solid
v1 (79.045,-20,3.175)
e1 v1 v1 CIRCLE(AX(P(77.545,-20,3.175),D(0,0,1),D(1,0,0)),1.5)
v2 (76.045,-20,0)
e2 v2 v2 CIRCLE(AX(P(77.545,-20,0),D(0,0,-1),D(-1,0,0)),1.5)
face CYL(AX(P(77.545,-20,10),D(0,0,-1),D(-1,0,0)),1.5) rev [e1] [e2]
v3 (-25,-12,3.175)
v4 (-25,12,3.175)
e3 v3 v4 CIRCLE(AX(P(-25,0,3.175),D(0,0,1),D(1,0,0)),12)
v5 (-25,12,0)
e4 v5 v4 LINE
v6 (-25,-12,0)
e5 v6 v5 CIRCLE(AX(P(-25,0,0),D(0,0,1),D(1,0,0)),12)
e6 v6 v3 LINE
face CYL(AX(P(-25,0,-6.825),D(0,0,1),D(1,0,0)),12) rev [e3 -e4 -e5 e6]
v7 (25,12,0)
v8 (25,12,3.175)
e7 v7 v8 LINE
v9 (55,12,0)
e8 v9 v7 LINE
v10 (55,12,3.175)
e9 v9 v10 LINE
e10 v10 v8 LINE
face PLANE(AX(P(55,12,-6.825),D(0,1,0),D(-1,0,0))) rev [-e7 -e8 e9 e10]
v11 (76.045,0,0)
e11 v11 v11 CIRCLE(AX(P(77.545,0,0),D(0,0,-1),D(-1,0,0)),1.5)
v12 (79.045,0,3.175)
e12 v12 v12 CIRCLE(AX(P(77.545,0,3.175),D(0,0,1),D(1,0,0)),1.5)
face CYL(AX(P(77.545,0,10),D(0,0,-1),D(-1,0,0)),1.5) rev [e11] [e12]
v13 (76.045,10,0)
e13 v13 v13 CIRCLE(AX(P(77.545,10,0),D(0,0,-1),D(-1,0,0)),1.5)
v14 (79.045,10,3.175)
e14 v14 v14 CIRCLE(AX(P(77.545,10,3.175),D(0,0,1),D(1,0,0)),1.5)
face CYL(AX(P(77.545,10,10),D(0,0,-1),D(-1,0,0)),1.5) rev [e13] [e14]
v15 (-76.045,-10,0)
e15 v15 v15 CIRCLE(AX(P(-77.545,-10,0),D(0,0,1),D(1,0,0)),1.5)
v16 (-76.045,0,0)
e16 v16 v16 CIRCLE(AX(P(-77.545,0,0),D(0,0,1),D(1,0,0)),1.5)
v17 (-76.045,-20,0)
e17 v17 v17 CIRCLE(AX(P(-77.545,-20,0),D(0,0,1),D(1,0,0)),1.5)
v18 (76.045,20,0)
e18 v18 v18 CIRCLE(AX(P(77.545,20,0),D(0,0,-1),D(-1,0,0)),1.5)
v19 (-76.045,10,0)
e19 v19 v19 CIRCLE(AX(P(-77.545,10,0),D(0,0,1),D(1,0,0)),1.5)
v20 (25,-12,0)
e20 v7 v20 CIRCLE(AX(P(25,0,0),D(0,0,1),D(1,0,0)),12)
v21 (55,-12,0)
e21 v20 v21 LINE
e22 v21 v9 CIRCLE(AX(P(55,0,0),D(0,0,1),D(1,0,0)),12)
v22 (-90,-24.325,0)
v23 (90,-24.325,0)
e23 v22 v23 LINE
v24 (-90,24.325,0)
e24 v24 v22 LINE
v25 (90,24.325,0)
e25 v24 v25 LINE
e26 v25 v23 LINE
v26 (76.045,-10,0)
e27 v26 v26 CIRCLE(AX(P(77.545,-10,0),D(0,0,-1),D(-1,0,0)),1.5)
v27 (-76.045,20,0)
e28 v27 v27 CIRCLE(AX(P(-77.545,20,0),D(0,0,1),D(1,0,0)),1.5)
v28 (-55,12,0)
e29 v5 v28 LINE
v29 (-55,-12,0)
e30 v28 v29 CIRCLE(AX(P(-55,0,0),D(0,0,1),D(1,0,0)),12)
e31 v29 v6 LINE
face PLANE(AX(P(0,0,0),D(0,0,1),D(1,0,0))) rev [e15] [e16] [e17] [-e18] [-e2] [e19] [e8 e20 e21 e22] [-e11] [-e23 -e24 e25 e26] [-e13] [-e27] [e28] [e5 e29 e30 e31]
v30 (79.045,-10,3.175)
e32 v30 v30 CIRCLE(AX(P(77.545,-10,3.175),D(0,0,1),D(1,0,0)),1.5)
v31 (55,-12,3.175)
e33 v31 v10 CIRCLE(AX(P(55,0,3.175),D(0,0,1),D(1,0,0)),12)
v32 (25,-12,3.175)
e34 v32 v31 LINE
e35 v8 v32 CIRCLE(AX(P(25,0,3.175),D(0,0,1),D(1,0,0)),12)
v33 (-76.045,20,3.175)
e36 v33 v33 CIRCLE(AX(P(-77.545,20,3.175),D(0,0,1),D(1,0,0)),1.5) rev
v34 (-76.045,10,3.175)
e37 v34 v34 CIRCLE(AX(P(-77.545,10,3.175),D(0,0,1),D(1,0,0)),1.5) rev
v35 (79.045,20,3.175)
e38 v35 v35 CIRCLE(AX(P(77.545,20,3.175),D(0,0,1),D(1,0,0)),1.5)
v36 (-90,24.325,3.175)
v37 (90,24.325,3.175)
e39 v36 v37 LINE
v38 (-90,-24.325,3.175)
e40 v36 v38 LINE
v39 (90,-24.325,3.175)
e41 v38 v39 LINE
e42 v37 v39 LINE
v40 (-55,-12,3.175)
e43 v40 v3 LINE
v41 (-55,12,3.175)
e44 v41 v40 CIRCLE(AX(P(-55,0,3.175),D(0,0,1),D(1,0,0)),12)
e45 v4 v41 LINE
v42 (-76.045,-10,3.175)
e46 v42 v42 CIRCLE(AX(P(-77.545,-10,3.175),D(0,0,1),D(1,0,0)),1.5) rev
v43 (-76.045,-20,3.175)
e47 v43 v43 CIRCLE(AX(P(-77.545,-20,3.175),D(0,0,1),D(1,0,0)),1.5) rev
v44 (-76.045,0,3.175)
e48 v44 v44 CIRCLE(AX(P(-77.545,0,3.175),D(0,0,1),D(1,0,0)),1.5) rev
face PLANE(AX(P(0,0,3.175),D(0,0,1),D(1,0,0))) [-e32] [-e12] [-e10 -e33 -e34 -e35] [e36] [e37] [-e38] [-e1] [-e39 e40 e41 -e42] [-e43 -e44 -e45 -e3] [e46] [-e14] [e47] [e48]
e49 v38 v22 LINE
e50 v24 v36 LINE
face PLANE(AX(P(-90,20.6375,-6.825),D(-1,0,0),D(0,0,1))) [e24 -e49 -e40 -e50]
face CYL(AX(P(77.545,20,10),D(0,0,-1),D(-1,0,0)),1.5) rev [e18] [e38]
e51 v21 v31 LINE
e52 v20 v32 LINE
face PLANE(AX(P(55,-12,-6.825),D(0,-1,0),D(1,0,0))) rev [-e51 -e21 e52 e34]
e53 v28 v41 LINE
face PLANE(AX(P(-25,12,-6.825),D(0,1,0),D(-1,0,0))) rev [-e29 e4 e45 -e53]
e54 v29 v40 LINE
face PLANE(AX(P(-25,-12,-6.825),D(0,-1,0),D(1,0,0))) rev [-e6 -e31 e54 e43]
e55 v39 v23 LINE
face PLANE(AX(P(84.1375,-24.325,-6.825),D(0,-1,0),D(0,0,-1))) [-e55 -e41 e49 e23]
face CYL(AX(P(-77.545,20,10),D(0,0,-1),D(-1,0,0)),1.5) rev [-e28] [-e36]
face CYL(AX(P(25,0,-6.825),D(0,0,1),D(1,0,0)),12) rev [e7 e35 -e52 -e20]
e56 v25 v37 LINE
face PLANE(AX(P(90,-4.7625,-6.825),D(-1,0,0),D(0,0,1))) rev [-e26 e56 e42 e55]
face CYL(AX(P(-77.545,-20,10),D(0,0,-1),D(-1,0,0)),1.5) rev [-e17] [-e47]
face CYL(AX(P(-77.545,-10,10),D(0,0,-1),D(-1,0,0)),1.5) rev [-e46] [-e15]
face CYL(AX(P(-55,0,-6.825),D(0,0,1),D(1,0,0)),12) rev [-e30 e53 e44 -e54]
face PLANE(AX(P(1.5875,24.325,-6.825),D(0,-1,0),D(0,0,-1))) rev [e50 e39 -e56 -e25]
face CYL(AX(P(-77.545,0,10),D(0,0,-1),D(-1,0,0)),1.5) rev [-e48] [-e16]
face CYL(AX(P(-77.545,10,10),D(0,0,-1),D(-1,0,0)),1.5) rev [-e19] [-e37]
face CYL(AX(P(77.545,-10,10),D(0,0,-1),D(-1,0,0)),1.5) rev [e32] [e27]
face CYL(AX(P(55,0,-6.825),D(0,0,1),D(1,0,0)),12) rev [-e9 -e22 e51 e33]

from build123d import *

# Parameters (mm, degrees)
SKETCH1_W                = 186.35
SKETCH1_H                = 55
BOSS_EXTRUDE1_DEPTH      = 3.175
SKETCH2_W                = 6.35
SKETCH2_H                = 3.175
CUT_EXTRUDE1_DEPTH       = 10
LPATTERN1_COUNT          = 5
LPATTERN1_PITCH          = 6.35
LPATTERN1_COUNT_DIR2     = 5
LPATTERN1_PITCH_DIR2     = 6.35
MIRROR1_COPY_1_SKETCH_W  = 6.35
MIRROR1_COPY_1_SKETCH_H  = 3.175
MIRROR1_COPY_1_DEPTH     = 10
MIRROR1_COPY_2_SKETCH_W  = 6.35
MIRROR1_COPY_2_SKETCH_H  = 3.175
MIRROR1_COPY_2_DEPTH     = 10
MIRROR1_COPY_3_SKETCH_W  = 6.35
MIRROR1_COPY_3_SKETCH_H  = 3.175
MIRROR1_COPY_3_DEPTH     = 10
MIRROR1_COPY_4_SKETCH_W  = 6.35
MIRROR1_COPY_4_SKETCH_H  = 3.175
MIRROR1_COPY_4_DEPTH     = 10
MIRROR1_COPY_5_SKETCH_W  = 6.35
MIRROR1_COPY_5_SKETCH_H  = 3.175
MIRROR1_COPY_5_DEPTH     = 10
MIRROR1_COPY_6_SKETCH_W  = 6.35
MIRROR1_COPY_6_SKETCH_H  = 3.175
MIRROR1_COPY_6_DEPTH     = 10
MIRROR1_COPY_7_SKETCH_W  = 6.35
MIRROR1_COPY_7_SKETCH_H  = 3.175
MIRROR1_COPY_7_DEPTH     = 10
MIRROR1_COPY_8_SKETCH_W  = 6.35
MIRROR1_COPY_8_SKETCH_H  = 3.175
MIRROR1_COPY_8_DEPTH     = 10
MIRROR1_COPY_9_SKETCH_W  = 6.35
MIRROR1_COPY_9_SKETCH_H  = 3.175
MIRROR1_COPY_9_DEPTH     = 10
MIRROR1_COPY_10_SKETCH_W = 6.35
MIRROR1_COPY_10_SKETCH_H = 3.175
MIRROR1_COPY_10_DEPTH    = 10
MIRROR1_COPY_11_SKETCH_W = 6.35
MIRROR1_COPY_11_SKETCH_H = 3.175
MIRROR1_COPY_11_DEPTH    = 10
MIRROR1_COPY_12_SKETCH_W = 6.35
MIRROR1_COPY_12_SKETCH_H = 3.175
MIRROR1_COPY_12_DEPTH    = 10
MIRROR1_COPY_13_SKETCH_W = 6.35
MIRROR1_COPY_13_SKETCH_H = 3.175
MIRROR1_COPY_13_DEPTH    = 10
MIRROR1_COPY_14_SKETCH_W = 6.35
MIRROR1_COPY_14_SKETCH_H = 3.175
MIRROR1_COPY_14_DEPTH    = 10
MIRROR1_COPY_15_SKETCH_W = 6.35
MIRROR1_COPY_15_SKETCH_H = 3.175
MIRROR1_COPY_15_DEPTH    = 10
MIRROR1_COPY_16_SKETCH_W = 6.35
MIRROR1_COPY_16_SKETCH_H = 3.175
MIRROR1_COPY_16_DEPTH    = 10
MIRROR1_COPY_17_SKETCH_W = 6.35
MIRROR1_COPY_17_SKETCH_H = 3.175
MIRROR1_COPY_17_DEPTH    = 10
MIRROR1_COPY_18_SKETCH_W = 6.35
MIRROR1_COPY_18_SKETCH_H = 3.175
MIRROR1_COPY_18_DEPTH    = 10
MIRROR1_COPY_19_SKETCH_W = 6.35
MIRROR1_COPY_19_SKETCH_H = 3.175
MIRROR1_COPY_19_DEPTH    = 10
MIRROR1_COPY_20_SKETCH_W = 6.35
MIRROR1_COPY_20_SKETCH_H = 3.175
MIRROR1_COPY_20_DEPTH    = 10
MIRROR1_COPY_21_SKETCH_W = 6.35
MIRROR1_COPY_21_SKETCH_H = 3.175
MIRROR1_COPY_21_DEPTH    = 10
MIRROR1_COPY_22_SKETCH_W = 6.35
MIRROR1_COPY_22_SKETCH_H = 3.175
MIRROR1_COPY_22_DEPTH    = 10
MIRROR1_COPY_23_SKETCH_W = 6.35
MIRROR1_COPY_23_SKETCH_H = 3.175
MIRROR1_COPY_23_DEPTH    = 10
SKETCH3_W                = 3.175
SKETCH3_H                = 3.6875
CUT_EXTRUDE2_DEPTH       = 10
SKETCH4_W                = 3.175
SKETCH4_H                = 6.35
CUT_EXTRUDE3_DEPTH       = 10
LPATTERN2_COUNT          = 15
LPATTERN2_PITCH          = 6.35
LPATTERN2_COUNT_DIR2     = 15
LPATTERN2_PITCH_DIR2     = 6.35
SKETCH5_W                = 5.375
SKETCH5_H                = 6.35
CUT_EXTRUDE4_DEPTH       = 10
CUT_EXTRUDE5_DEPTH       = 10
SKETCH7_R                = 1.5
CUT_EXTRUDE6_DEPTH       = 10
LPATTERN3_COUNT          = 3
LPATTERN3_PITCH          = 10
LPATTERN3_COL_COUNT      = 3
LPATTERN3_COL_PITCH      = 10
MIRROR3_COPY_1_SKETCH_R  = 1.5
MIRROR3_COPY_1_DEPTH     = 10
MIRROR3_COPY_2_SKETCH_R  = 1.5
MIRROR3_COPY_2_DEPTH     = 10
MIRROR3_COPY_3_SKETCH_R  = 1.5
MIRROR3_COPY_3_DEPTH     = 10
MIRROR3_COPY_4_SKETCH_R  = 1.5
MIRROR3_COPY_4_DEPTH     = 10
SKETCH8_W                = 180
SKETCH8_H                = 3.175
CUT_EXTRUDE7_DEPTH       = 10
SKETCH9_W                = 3.175
SKETCH9_H                = 48.65
CUT_EXTRUDE8_DEPTH       = 10


# Read off the part's stored shape, not the designer's step: Mirror2
with BuildPart() as part:
    # Sketch1 → Boss-Extrude1 (new body)
    with BuildSketch(Plane.XY):
        Rectangle(SKETCH1_W, SKETCH1_H)
    extrude(amount=BOSS_EXTRUDE1_DEPTH)

    # Sketch2 → Cut-Extrude1 (cut)
    with BuildSketch(Plane.XY.offset(3.175)):
        with Locations((93.175, -3.175)):
            Rectangle(SKETCH2_W, SKETCH2_H)
    cut_extrude1 = extrude(amount=-CUT_EXTRUDE1_DEPTH, mode=Mode.SUBTRACT)

    # LPattern1: Cut-Extrude1 5 × 5, 1 skipped
    with Locations(*[Vector(0, 1, 0) * (i * LPATTERN1_PITCH) + Vector(0, -1, 0) * (j * LPATTERN1_PITCH_DIR2) for i in range(LPATTERN1_COUNT) for j in range(LPATTERN1_COUNT_DIR2) if (i, j) not in ((0, 0), (0, 4))]):
        add(cut_extrude1, mode=Mode.SUBTRACT)

    # Mirror1: Cut-Extrude1 across plane
    add(cut_extrude1.mirror(Plane(origin=(0, 0, 0), x_dir=(0, 0, 1), z_dir=(1, 0, 0))), mode=Mode.SUBTRACT)

    # Mirror1 copy 1 sketch → Mirror1 copy 1 (cut)
    with BuildSketch(Plane(origin=(0, -6.35, 3.175), x_dir=(-1, 0, 0), z_dir=(0, 0, 1))):
        with Locations((93.175, 3.175)):
            Rectangle(MIRROR1_COPY_1_SKETCH_W, MIRROR1_COPY_1_SKETCH_H)
    extrude(amount=-MIRROR1_COPY_1_DEPTH, mode=Mode.SUBTRACT)

    # Mirror1 copy 2 sketch → Mirror1 copy 2 (cut)
    with BuildSketch(Plane(origin=(0, -12.7, 3.175), x_dir=(-1, 0, 0), z_dir=(0, 0, 1))):
        with Locations((93.175, 3.175)):
            Rectangle(MIRROR1_COPY_2_SKETCH_W, MIRROR1_COPY_2_SKETCH_H)
    extrude(amount=-MIRROR1_COPY_2_DEPTH, mode=Mode.SUBTRACT)

    # Mirror1 copy 3 sketch → Mirror1 copy 3 (cut)
    with BuildSketch(Plane(origin=(0, -19.05, 3.175), x_dir=(-1, 0, 0), z_dir=(0, 0, 1))):
        with Locations((93.175, 3.175)):
            Rectangle(MIRROR1_COPY_3_SKETCH_W, MIRROR1_COPY_3_SKETCH_H)
    extrude(amount=-MIRROR1_COPY_3_DEPTH, mode=Mode.SUBTRACT)

    # Mirror1 copy 4 sketch → Mirror1 copy 4 (cut)
    with BuildSketch(Plane(origin=(0, 6.35, 3.175), x_dir=(-1, 0, 0), z_dir=(0, 0, 1))):
        with Locations((93.175, 3.175)):
            Rectangle(MIRROR1_COPY_4_SKETCH_W, MIRROR1_COPY_4_SKETCH_H)
    extrude(amount=-MIRROR1_COPY_4_DEPTH, mode=Mode.SUBTRACT)

    # Mirror1 copy 5 sketch → Mirror1 copy 5 (cut)
    with BuildSketch(Plane(origin=(0, 0, 3.175), x_dir=(-1, 0, 0), z_dir=(0, 0, 1))):
        with Locations((93.175, 3.175)):
            Rectangle(MIRROR1_COPY_5_SKETCH_W, MIRROR1_COPY_5_SKETCH_H)
    extrude(amount=-MIRROR1_COPY_5_DEPTH, mode=Mode.SUBTRACT)

    # Mirror1 copy 6 sketch → Mirror1 copy 6 (cut)
    with BuildSketch(Plane(origin=(0, -6.35, 3.175), x_dir=(-1, 0, 0), z_dir=(0, 0, 1))):
        with Locations((93.175, 3.175)):
            Rectangle(MIRROR1_COPY_6_SKETCH_W, MIRROR1_COPY_6_SKETCH_H)
    extrude(amount=-MIRROR1_COPY_6_DEPTH, mode=Mode.SUBTRACT)

    # Mirror1 copy 7 sketch → Mirror1 copy 7 (cut)
    with BuildSketch(Plane(origin=(0, -12.7, 3.175), x_dir=(-1, 0, 0), z_dir=(0, 0, 1))):
        with Locations((93.175, 3.175)):
            Rectangle(MIRROR1_COPY_7_SKETCH_W, MIRROR1_COPY_7_SKETCH_H)
    extrude(amount=-MIRROR1_COPY_7_DEPTH, mode=Mode.SUBTRACT)

    # Mirror1 copy 8 sketch → Mirror1 copy 8 (cut)
    with BuildSketch(Plane(origin=(0, -19.05, 3.175), x_dir=(-1, 0, 0), z_dir=(0, 0, 1))):
        with Locations((93.175, 3.175)):
            Rectangle(MIRROR1_COPY_8_SKETCH_W, MIRROR1_COPY_8_SKETCH_H)
    extrude(amount=-MIRROR1_COPY_8_DEPTH, mode=Mode.SUBTRACT)

    # Mirror1 copy 9 sketch → Mirror1 copy 9 (cut)
    with BuildSketch(Plane(origin=(0, 12.7, 3.175), x_dir=(-1, 0, 0), z_dir=(0, 0, 1))):
        with Locations((93.175, 3.175)):
            Rectangle(MIRROR1_COPY_9_SKETCH_W, MIRROR1_COPY_9_SKETCH_H)
    extrude(amount=-MIRROR1_COPY_9_DEPTH, mode=Mode.SUBTRACT)

    # Mirror1 copy 10 sketch → Mirror1 copy 10 (cut)
    with BuildSketch(Plane(origin=(0, 6.35, 3.175), x_dir=(-1, 0, 0), z_dir=(0, 0, 1))):
        with Locations((93.175, 3.175)):
            Rectangle(MIRROR1_COPY_10_SKETCH_W, MIRROR1_COPY_10_SKETCH_H)
    extrude(amount=-MIRROR1_COPY_10_DEPTH, mode=Mode.SUBTRACT)

    # Mirror1 copy 11 sketch → Mirror1 copy 11 (cut)
    with BuildSketch(Plane(origin=(0, 0, 3.175), x_dir=(-1, 0, 0), z_dir=(0, 0, 1))):
        with Locations((93.175, 3.175)):
            Rectangle(MIRROR1_COPY_11_SKETCH_W, MIRROR1_COPY_11_SKETCH_H)
    extrude(amount=-MIRROR1_COPY_11_DEPTH, mode=Mode.SUBTRACT)

    # Mirror1 copy 12 sketch → Mirror1 copy 12 (cut)
    with BuildSketch(Plane(origin=(0, -6.35, 3.175), x_dir=(-1, 0, 0), z_dir=(0, 0, 1))):
        with Locations((93.175, 3.175)):
            Rectangle(MIRROR1_COPY_12_SKETCH_W, MIRROR1_COPY_12_SKETCH_H)
    extrude(amount=-MIRROR1_COPY_12_DEPTH, mode=Mode.SUBTRACT)

    # Mirror1 copy 13 sketch → Mirror1 copy 13 (cut)
    with BuildSketch(Plane(origin=(0, -12.7, 3.175), x_dir=(-1, 0, 0), z_dir=(0, 0, 1))):
        with Locations((93.175, 3.175)):
            Rectangle(MIRROR1_COPY_13_SKETCH_W, MIRROR1_COPY_13_SKETCH_H)
    extrude(amount=-MIRROR1_COPY_13_DEPTH, mode=Mode.SUBTRACT)

    # Mirror1 copy 14 sketch → Mirror1 copy 14 (cut)
    with BuildSketch(Plane(origin=(0, 19.05, 3.175), x_dir=(-1, 0, 0), z_dir=(0, 0, 1))):
        with Locations((93.175, 3.175)):
            Rectangle(MIRROR1_COPY_14_SKETCH_W, MIRROR1_COPY_14_SKETCH_H)
    extrude(amount=-MIRROR1_COPY_14_DEPTH, mode=Mode.SUBTRACT)

    # Mirror1 copy 15 sketch → Mirror1 copy 15 (cut)
    with BuildSketch(Plane(origin=(0, 12.7, 3.175), x_dir=(-1, 0, 0), z_dir=(0, 0, 1))):
        with Locations((93.175, 3.175)):
            Rectangle(MIRROR1_COPY_15_SKETCH_W, MIRROR1_COPY_15_SKETCH_H)
    extrude(amount=-MIRROR1_COPY_15_DEPTH, mode=Mode.SUBTRACT)

    # Mirror1 copy 16 sketch → Mirror1 copy 16 (cut)
    with BuildSketch(Plane(origin=(0, 6.35, 3.175), x_dir=(-1, 0, 0), z_dir=(0, 0, 1))):
        with Locations((93.175, 3.175)):
            Rectangle(MIRROR1_COPY_16_SKETCH_W, MIRROR1_COPY_16_SKETCH_H)
    extrude(amount=-MIRROR1_COPY_16_DEPTH, mode=Mode.SUBTRACT)

    # Mirror1 copy 17 sketch → Mirror1 copy 17 (cut)
    with BuildSketch(Plane(origin=(0, 0, 3.175), x_dir=(-1, 0, 0), z_dir=(0, 0, 1))):
        with Locations((93.175, 3.175)):
            Rectangle(MIRROR1_COPY_17_SKETCH_W, MIRROR1_COPY_17_SKETCH_H)
    extrude(amount=-MIRROR1_COPY_17_DEPTH, mode=Mode.SUBTRACT)

    # Mirror1 copy 18 sketch → Mirror1 copy 18 (cut)
    with BuildSketch(Plane(origin=(0, -6.35, 3.175), x_dir=(-1, 0, 0), z_dir=(0, 0, 1))):
        with Locations((93.175, 3.175)):
            Rectangle(MIRROR1_COPY_18_SKETCH_W, MIRROR1_COPY_18_SKETCH_H)
    extrude(amount=-MIRROR1_COPY_18_DEPTH, mode=Mode.SUBTRACT)

    # Mirror1 copy 19 sketch → Mirror1 copy 19 (cut)
    with BuildSketch(Plane(origin=(0, 25.4, 3.175), x_dir=(-1, 0, 0), z_dir=(0, 0, 1))):
        with Locations((93.175, 3.175)):
            Rectangle(MIRROR1_COPY_19_SKETCH_W, MIRROR1_COPY_19_SKETCH_H)
    extrude(amount=-MIRROR1_COPY_19_DEPTH, mode=Mode.SUBTRACT)

    # Mirror1 copy 20 sketch → Mirror1 copy 20 (cut)
    with BuildSketch(Plane(origin=(0, 19.05, 3.175), x_dir=(-1, 0, 0), z_dir=(0, 0, 1))):
        with Locations((93.175, 3.175)):
            Rectangle(MIRROR1_COPY_20_SKETCH_W, MIRROR1_COPY_20_SKETCH_H)
    extrude(amount=-MIRROR1_COPY_20_DEPTH, mode=Mode.SUBTRACT)

    # Mirror1 copy 21 sketch → Mirror1 copy 21 (cut)
    with BuildSketch(Plane(origin=(0, 12.7, 3.175), x_dir=(-1, 0, 0), z_dir=(0, 0, 1))):
        with Locations((93.175, 3.175)):
            Rectangle(MIRROR1_COPY_21_SKETCH_W, MIRROR1_COPY_21_SKETCH_H)
    extrude(amount=-MIRROR1_COPY_21_DEPTH, mode=Mode.SUBTRACT)

    # Mirror1 copy 22 sketch → Mirror1 copy 22 (cut)
    with BuildSketch(Plane(origin=(0, 6.35, 3.175), x_dir=(-1, 0, 0), z_dir=(0, 0, 1))):
        with Locations((93.175, 3.175)):
            Rectangle(MIRROR1_COPY_22_SKETCH_W, MIRROR1_COPY_22_SKETCH_H)
    extrude(amount=-MIRROR1_COPY_22_DEPTH, mode=Mode.SUBTRACT)

    # Mirror1 copy 23 sketch → Mirror1 copy 23 (cut)
    with BuildSketch(Plane(origin=(0, 0, 3.175), x_dir=(-1, 0, 0), z_dir=(0, 0, 1))):
        with Locations((93.175, 3.175)):
            Rectangle(MIRROR1_COPY_23_SKETCH_W, MIRROR1_COPY_23_SKETCH_H)
    extrude(amount=-MIRROR1_COPY_23_DEPTH, mode=Mode.SUBTRACT)

    # Sketch3 → Cut-Extrude2 (cut)
    with BuildSketch(Plane.XY.offset(3.175)):
        with Locations((-91.5875, 25.65625)):
            Rectangle(SKETCH3_W, SKETCH3_H)
        with Locations((91.5875, 25.65625)):
            Rectangle(SKETCH3_W, SKETCH3_H)
        with Locations((91.5875, -25.65625)):
            Rectangle(SKETCH3_W, SKETCH3_H)
        with Locations((-91.5875, -25.65625)):
            Rectangle(SKETCH3_W, SKETCH3_H)
    extrude(amount=-CUT_EXTRUDE2_DEPTH, mode=Mode.SUBTRACT)

    # Sketch4 → Cut-Extrude3 (cut)
    with BuildSketch(Plane.XY.offset(3.175)):
        with Locations((3.175, 27.5)):
            Rectangle(SKETCH4_W, SKETCH4_H)
    cut_extrude3 = extrude(amount=-CUT_EXTRUDE3_DEPTH, mode=Mode.SUBTRACT)

    # LPattern2: Cut-Extrude3 15 × 15, 1 skipped
    with Locations(*[Vector(1, 0, 0) * (i * LPATTERN2_PITCH) + Vector(-1, 0, 0) * (j * LPATTERN2_PITCH_DIR2) for i in range(LPATTERN2_COUNT) for j in range(LPATTERN2_COUNT_DIR2) if (i, j) not in ((0, 0), (14, 0))]):
        add(cut_extrude3, mode=Mode.SUBTRACT)

    # Mirror2
    split(bisect_by=Plane.ZX, keep=Keep.TOP)

    # Mirror2 2: part across plane


with BuildPart() as part_1:
    add(part.part)
    add(part.part.mirror(Plane.ZX))

    # Sketch5 → Cut-Extrude4 (cut)
    with BuildSketch(Plane.XY.offset(3.175)):
        with Locations((-90, 27.5)):
            Rectangle(SKETCH5_W, SKETCH5_H)
        with Locations((90, 27.5)):
            Rectangle(SKETCH5_W, SKETCH5_H)
        with Locations((90, -27.5)):
            Rectangle(SKETCH5_W, SKETCH5_H)
        with Locations((-90, -27.5)):
            Rectangle(SKETCH5_W, SKETCH5_H)
    extrude(amount=-CUT_EXTRUDE4_DEPTH, mode=Mode.SUBTRACT)

    # Sketch6 → Cut-Extrude5 (cut)
    with BuildSketch(Plane.XY.offset(3.175)):
        with BuildLine():
            Line((-25, -12), (-55, -12))
            ThreePointArc((-55, -12), (-67, 0), (-55, 12))
            Line((-55, 12), (-25, 12))
            ThreePointArc((-25, 12), (-13, 0), (-25, -12))
        make_face()
        with BuildLine():
            Line((55, -12), (25, -12))
            ThreePointArc((25, -12), (13, 0), (25, 12))
            Line((25, 12), (55, 12))
            ThreePointArc((55, 12), (67, 0), (55, -12))
        make_face()
    extrude(amount=-CUT_EXTRUDE5_DEPTH, mode=Mode.SUBTRACT)

    # Sketch7 → Cut-Extrude6 (cut)
    with BuildSketch(Plane(origin=(0, 0, 0), x_dir=(-1, 0, 0), z_dir=(0, 0, -1))):
        with Locations((-77.545, 0)):
            Circle(SKETCH7_R)
    cut_extrude6 = extrude(amount=-CUT_EXTRUDE6_DEPTH, mode=Mode.SUBTRACT)

    # LPattern3: Cut-Extrude6 ×3
    with Locations(*[(0, i * LPATTERN3_PITCH, 0) for i in range(1, LPATTERN3_COUNT)]):
        add(cut_extrude6, mode=Mode.SUBTRACT)

    # LPattern3 col: Cut-Extrude6 ×3
    with Locations(*[(0, -i * LPATTERN3_COL_PITCH, 0) for i in range(1, LPATTERN3_COL_COUNT)]):
        add(cut_extrude6, mode=Mode.SUBTRACT)

    # Mirror3: Cut-Extrude6 across plane
    add(cut_extrude6.mirror(Plane(origin=(0, 0, 0), x_dir=(0, 0, 1), z_dir=(1, 0, 0))), mode=Mode.SUBTRACT)

    # Mirror3 copy 1 sketch → Mirror3 copy 1 (cut)
    with BuildSketch(Plane(origin=(0, 10, 0), x_dir=(1, 0, 0), z_dir=(0, 0, -1))):
        with Locations((-77.545, 0)):
            Circle(MIRROR3_COPY_1_SKETCH_R)
    extrude(amount=-MIRROR3_COPY_1_DEPTH, mode=Mode.SUBTRACT)

    # Mirror3 copy 2 sketch → Mirror3 copy 2 (cut)
    with BuildSketch(Plane(origin=(0, 20, 0), x_dir=(1, 0, 0), z_dir=(0, 0, -1))):
        with Locations((-77.545, 0)):
            Circle(MIRROR3_COPY_2_SKETCH_R)
    extrude(amount=-MIRROR3_COPY_2_DEPTH, mode=Mode.SUBTRACT)

    # Mirror3 copy 3 sketch → Mirror3 copy 3 (cut)
    with BuildSketch(Plane(origin=(0, -10, 0), x_dir=(1, 0, 0), z_dir=(0, 0, -1))):
        with Locations((-77.545, 0)):
            Circle(MIRROR3_COPY_3_SKETCH_R)
    extrude(amount=-MIRROR3_COPY_3_DEPTH, mode=Mode.SUBTRACT)

    # Mirror3 copy 4 sketch → Mirror3 copy 4 (cut)
    with BuildSketch(Plane(origin=(0, -20, 0), x_dir=(1, 0, 0), z_dir=(0, 0, -1))):
        with Locations((-77.545, 0)):
            Circle(MIRROR3_COPY_4_SKETCH_R)
    extrude(amount=-MIRROR3_COPY_4_DEPTH, mode=Mode.SUBTRACT)

    # Sketch8 → Cut-Extrude7 (cut)
    with BuildSketch(Plane.XY.offset(3.175)):
        with Locations((0, 25.9125)):
            Rectangle(SKETCH8_W, SKETCH8_H)
    cut_extrude7 = extrude(amount=-CUT_EXTRUDE7_DEPTH, mode=Mode.SUBTRACT)

    # Mirror4: Cut-Extrude7 across plane
    add(cut_extrude7.mirror(Plane.ZX), mode=Mode.SUBTRACT)

    # Sketch9 → Cut-Extrude8 (cut)
    with BuildSketch(Plane.XY.offset(3.175)):
        with Locations((-91.5875, 0)):
            Rectangle(SKETCH9_W, SKETCH9_H)
    cut_extrude8 = extrude(amount=-CUT_EXTRUDE8_DEPTH, mode=Mode.SUBTRACT)

    # Mirror5: Cut-Extrude8 across plane
    add(cut_extrude8.mirror(Plane(origin=(0, 0, 0), x_dir=(0, 0, 1), z_dir=(1, 0, 0))), mode=Mode.SUBTRACT)


solid = part_1.part
